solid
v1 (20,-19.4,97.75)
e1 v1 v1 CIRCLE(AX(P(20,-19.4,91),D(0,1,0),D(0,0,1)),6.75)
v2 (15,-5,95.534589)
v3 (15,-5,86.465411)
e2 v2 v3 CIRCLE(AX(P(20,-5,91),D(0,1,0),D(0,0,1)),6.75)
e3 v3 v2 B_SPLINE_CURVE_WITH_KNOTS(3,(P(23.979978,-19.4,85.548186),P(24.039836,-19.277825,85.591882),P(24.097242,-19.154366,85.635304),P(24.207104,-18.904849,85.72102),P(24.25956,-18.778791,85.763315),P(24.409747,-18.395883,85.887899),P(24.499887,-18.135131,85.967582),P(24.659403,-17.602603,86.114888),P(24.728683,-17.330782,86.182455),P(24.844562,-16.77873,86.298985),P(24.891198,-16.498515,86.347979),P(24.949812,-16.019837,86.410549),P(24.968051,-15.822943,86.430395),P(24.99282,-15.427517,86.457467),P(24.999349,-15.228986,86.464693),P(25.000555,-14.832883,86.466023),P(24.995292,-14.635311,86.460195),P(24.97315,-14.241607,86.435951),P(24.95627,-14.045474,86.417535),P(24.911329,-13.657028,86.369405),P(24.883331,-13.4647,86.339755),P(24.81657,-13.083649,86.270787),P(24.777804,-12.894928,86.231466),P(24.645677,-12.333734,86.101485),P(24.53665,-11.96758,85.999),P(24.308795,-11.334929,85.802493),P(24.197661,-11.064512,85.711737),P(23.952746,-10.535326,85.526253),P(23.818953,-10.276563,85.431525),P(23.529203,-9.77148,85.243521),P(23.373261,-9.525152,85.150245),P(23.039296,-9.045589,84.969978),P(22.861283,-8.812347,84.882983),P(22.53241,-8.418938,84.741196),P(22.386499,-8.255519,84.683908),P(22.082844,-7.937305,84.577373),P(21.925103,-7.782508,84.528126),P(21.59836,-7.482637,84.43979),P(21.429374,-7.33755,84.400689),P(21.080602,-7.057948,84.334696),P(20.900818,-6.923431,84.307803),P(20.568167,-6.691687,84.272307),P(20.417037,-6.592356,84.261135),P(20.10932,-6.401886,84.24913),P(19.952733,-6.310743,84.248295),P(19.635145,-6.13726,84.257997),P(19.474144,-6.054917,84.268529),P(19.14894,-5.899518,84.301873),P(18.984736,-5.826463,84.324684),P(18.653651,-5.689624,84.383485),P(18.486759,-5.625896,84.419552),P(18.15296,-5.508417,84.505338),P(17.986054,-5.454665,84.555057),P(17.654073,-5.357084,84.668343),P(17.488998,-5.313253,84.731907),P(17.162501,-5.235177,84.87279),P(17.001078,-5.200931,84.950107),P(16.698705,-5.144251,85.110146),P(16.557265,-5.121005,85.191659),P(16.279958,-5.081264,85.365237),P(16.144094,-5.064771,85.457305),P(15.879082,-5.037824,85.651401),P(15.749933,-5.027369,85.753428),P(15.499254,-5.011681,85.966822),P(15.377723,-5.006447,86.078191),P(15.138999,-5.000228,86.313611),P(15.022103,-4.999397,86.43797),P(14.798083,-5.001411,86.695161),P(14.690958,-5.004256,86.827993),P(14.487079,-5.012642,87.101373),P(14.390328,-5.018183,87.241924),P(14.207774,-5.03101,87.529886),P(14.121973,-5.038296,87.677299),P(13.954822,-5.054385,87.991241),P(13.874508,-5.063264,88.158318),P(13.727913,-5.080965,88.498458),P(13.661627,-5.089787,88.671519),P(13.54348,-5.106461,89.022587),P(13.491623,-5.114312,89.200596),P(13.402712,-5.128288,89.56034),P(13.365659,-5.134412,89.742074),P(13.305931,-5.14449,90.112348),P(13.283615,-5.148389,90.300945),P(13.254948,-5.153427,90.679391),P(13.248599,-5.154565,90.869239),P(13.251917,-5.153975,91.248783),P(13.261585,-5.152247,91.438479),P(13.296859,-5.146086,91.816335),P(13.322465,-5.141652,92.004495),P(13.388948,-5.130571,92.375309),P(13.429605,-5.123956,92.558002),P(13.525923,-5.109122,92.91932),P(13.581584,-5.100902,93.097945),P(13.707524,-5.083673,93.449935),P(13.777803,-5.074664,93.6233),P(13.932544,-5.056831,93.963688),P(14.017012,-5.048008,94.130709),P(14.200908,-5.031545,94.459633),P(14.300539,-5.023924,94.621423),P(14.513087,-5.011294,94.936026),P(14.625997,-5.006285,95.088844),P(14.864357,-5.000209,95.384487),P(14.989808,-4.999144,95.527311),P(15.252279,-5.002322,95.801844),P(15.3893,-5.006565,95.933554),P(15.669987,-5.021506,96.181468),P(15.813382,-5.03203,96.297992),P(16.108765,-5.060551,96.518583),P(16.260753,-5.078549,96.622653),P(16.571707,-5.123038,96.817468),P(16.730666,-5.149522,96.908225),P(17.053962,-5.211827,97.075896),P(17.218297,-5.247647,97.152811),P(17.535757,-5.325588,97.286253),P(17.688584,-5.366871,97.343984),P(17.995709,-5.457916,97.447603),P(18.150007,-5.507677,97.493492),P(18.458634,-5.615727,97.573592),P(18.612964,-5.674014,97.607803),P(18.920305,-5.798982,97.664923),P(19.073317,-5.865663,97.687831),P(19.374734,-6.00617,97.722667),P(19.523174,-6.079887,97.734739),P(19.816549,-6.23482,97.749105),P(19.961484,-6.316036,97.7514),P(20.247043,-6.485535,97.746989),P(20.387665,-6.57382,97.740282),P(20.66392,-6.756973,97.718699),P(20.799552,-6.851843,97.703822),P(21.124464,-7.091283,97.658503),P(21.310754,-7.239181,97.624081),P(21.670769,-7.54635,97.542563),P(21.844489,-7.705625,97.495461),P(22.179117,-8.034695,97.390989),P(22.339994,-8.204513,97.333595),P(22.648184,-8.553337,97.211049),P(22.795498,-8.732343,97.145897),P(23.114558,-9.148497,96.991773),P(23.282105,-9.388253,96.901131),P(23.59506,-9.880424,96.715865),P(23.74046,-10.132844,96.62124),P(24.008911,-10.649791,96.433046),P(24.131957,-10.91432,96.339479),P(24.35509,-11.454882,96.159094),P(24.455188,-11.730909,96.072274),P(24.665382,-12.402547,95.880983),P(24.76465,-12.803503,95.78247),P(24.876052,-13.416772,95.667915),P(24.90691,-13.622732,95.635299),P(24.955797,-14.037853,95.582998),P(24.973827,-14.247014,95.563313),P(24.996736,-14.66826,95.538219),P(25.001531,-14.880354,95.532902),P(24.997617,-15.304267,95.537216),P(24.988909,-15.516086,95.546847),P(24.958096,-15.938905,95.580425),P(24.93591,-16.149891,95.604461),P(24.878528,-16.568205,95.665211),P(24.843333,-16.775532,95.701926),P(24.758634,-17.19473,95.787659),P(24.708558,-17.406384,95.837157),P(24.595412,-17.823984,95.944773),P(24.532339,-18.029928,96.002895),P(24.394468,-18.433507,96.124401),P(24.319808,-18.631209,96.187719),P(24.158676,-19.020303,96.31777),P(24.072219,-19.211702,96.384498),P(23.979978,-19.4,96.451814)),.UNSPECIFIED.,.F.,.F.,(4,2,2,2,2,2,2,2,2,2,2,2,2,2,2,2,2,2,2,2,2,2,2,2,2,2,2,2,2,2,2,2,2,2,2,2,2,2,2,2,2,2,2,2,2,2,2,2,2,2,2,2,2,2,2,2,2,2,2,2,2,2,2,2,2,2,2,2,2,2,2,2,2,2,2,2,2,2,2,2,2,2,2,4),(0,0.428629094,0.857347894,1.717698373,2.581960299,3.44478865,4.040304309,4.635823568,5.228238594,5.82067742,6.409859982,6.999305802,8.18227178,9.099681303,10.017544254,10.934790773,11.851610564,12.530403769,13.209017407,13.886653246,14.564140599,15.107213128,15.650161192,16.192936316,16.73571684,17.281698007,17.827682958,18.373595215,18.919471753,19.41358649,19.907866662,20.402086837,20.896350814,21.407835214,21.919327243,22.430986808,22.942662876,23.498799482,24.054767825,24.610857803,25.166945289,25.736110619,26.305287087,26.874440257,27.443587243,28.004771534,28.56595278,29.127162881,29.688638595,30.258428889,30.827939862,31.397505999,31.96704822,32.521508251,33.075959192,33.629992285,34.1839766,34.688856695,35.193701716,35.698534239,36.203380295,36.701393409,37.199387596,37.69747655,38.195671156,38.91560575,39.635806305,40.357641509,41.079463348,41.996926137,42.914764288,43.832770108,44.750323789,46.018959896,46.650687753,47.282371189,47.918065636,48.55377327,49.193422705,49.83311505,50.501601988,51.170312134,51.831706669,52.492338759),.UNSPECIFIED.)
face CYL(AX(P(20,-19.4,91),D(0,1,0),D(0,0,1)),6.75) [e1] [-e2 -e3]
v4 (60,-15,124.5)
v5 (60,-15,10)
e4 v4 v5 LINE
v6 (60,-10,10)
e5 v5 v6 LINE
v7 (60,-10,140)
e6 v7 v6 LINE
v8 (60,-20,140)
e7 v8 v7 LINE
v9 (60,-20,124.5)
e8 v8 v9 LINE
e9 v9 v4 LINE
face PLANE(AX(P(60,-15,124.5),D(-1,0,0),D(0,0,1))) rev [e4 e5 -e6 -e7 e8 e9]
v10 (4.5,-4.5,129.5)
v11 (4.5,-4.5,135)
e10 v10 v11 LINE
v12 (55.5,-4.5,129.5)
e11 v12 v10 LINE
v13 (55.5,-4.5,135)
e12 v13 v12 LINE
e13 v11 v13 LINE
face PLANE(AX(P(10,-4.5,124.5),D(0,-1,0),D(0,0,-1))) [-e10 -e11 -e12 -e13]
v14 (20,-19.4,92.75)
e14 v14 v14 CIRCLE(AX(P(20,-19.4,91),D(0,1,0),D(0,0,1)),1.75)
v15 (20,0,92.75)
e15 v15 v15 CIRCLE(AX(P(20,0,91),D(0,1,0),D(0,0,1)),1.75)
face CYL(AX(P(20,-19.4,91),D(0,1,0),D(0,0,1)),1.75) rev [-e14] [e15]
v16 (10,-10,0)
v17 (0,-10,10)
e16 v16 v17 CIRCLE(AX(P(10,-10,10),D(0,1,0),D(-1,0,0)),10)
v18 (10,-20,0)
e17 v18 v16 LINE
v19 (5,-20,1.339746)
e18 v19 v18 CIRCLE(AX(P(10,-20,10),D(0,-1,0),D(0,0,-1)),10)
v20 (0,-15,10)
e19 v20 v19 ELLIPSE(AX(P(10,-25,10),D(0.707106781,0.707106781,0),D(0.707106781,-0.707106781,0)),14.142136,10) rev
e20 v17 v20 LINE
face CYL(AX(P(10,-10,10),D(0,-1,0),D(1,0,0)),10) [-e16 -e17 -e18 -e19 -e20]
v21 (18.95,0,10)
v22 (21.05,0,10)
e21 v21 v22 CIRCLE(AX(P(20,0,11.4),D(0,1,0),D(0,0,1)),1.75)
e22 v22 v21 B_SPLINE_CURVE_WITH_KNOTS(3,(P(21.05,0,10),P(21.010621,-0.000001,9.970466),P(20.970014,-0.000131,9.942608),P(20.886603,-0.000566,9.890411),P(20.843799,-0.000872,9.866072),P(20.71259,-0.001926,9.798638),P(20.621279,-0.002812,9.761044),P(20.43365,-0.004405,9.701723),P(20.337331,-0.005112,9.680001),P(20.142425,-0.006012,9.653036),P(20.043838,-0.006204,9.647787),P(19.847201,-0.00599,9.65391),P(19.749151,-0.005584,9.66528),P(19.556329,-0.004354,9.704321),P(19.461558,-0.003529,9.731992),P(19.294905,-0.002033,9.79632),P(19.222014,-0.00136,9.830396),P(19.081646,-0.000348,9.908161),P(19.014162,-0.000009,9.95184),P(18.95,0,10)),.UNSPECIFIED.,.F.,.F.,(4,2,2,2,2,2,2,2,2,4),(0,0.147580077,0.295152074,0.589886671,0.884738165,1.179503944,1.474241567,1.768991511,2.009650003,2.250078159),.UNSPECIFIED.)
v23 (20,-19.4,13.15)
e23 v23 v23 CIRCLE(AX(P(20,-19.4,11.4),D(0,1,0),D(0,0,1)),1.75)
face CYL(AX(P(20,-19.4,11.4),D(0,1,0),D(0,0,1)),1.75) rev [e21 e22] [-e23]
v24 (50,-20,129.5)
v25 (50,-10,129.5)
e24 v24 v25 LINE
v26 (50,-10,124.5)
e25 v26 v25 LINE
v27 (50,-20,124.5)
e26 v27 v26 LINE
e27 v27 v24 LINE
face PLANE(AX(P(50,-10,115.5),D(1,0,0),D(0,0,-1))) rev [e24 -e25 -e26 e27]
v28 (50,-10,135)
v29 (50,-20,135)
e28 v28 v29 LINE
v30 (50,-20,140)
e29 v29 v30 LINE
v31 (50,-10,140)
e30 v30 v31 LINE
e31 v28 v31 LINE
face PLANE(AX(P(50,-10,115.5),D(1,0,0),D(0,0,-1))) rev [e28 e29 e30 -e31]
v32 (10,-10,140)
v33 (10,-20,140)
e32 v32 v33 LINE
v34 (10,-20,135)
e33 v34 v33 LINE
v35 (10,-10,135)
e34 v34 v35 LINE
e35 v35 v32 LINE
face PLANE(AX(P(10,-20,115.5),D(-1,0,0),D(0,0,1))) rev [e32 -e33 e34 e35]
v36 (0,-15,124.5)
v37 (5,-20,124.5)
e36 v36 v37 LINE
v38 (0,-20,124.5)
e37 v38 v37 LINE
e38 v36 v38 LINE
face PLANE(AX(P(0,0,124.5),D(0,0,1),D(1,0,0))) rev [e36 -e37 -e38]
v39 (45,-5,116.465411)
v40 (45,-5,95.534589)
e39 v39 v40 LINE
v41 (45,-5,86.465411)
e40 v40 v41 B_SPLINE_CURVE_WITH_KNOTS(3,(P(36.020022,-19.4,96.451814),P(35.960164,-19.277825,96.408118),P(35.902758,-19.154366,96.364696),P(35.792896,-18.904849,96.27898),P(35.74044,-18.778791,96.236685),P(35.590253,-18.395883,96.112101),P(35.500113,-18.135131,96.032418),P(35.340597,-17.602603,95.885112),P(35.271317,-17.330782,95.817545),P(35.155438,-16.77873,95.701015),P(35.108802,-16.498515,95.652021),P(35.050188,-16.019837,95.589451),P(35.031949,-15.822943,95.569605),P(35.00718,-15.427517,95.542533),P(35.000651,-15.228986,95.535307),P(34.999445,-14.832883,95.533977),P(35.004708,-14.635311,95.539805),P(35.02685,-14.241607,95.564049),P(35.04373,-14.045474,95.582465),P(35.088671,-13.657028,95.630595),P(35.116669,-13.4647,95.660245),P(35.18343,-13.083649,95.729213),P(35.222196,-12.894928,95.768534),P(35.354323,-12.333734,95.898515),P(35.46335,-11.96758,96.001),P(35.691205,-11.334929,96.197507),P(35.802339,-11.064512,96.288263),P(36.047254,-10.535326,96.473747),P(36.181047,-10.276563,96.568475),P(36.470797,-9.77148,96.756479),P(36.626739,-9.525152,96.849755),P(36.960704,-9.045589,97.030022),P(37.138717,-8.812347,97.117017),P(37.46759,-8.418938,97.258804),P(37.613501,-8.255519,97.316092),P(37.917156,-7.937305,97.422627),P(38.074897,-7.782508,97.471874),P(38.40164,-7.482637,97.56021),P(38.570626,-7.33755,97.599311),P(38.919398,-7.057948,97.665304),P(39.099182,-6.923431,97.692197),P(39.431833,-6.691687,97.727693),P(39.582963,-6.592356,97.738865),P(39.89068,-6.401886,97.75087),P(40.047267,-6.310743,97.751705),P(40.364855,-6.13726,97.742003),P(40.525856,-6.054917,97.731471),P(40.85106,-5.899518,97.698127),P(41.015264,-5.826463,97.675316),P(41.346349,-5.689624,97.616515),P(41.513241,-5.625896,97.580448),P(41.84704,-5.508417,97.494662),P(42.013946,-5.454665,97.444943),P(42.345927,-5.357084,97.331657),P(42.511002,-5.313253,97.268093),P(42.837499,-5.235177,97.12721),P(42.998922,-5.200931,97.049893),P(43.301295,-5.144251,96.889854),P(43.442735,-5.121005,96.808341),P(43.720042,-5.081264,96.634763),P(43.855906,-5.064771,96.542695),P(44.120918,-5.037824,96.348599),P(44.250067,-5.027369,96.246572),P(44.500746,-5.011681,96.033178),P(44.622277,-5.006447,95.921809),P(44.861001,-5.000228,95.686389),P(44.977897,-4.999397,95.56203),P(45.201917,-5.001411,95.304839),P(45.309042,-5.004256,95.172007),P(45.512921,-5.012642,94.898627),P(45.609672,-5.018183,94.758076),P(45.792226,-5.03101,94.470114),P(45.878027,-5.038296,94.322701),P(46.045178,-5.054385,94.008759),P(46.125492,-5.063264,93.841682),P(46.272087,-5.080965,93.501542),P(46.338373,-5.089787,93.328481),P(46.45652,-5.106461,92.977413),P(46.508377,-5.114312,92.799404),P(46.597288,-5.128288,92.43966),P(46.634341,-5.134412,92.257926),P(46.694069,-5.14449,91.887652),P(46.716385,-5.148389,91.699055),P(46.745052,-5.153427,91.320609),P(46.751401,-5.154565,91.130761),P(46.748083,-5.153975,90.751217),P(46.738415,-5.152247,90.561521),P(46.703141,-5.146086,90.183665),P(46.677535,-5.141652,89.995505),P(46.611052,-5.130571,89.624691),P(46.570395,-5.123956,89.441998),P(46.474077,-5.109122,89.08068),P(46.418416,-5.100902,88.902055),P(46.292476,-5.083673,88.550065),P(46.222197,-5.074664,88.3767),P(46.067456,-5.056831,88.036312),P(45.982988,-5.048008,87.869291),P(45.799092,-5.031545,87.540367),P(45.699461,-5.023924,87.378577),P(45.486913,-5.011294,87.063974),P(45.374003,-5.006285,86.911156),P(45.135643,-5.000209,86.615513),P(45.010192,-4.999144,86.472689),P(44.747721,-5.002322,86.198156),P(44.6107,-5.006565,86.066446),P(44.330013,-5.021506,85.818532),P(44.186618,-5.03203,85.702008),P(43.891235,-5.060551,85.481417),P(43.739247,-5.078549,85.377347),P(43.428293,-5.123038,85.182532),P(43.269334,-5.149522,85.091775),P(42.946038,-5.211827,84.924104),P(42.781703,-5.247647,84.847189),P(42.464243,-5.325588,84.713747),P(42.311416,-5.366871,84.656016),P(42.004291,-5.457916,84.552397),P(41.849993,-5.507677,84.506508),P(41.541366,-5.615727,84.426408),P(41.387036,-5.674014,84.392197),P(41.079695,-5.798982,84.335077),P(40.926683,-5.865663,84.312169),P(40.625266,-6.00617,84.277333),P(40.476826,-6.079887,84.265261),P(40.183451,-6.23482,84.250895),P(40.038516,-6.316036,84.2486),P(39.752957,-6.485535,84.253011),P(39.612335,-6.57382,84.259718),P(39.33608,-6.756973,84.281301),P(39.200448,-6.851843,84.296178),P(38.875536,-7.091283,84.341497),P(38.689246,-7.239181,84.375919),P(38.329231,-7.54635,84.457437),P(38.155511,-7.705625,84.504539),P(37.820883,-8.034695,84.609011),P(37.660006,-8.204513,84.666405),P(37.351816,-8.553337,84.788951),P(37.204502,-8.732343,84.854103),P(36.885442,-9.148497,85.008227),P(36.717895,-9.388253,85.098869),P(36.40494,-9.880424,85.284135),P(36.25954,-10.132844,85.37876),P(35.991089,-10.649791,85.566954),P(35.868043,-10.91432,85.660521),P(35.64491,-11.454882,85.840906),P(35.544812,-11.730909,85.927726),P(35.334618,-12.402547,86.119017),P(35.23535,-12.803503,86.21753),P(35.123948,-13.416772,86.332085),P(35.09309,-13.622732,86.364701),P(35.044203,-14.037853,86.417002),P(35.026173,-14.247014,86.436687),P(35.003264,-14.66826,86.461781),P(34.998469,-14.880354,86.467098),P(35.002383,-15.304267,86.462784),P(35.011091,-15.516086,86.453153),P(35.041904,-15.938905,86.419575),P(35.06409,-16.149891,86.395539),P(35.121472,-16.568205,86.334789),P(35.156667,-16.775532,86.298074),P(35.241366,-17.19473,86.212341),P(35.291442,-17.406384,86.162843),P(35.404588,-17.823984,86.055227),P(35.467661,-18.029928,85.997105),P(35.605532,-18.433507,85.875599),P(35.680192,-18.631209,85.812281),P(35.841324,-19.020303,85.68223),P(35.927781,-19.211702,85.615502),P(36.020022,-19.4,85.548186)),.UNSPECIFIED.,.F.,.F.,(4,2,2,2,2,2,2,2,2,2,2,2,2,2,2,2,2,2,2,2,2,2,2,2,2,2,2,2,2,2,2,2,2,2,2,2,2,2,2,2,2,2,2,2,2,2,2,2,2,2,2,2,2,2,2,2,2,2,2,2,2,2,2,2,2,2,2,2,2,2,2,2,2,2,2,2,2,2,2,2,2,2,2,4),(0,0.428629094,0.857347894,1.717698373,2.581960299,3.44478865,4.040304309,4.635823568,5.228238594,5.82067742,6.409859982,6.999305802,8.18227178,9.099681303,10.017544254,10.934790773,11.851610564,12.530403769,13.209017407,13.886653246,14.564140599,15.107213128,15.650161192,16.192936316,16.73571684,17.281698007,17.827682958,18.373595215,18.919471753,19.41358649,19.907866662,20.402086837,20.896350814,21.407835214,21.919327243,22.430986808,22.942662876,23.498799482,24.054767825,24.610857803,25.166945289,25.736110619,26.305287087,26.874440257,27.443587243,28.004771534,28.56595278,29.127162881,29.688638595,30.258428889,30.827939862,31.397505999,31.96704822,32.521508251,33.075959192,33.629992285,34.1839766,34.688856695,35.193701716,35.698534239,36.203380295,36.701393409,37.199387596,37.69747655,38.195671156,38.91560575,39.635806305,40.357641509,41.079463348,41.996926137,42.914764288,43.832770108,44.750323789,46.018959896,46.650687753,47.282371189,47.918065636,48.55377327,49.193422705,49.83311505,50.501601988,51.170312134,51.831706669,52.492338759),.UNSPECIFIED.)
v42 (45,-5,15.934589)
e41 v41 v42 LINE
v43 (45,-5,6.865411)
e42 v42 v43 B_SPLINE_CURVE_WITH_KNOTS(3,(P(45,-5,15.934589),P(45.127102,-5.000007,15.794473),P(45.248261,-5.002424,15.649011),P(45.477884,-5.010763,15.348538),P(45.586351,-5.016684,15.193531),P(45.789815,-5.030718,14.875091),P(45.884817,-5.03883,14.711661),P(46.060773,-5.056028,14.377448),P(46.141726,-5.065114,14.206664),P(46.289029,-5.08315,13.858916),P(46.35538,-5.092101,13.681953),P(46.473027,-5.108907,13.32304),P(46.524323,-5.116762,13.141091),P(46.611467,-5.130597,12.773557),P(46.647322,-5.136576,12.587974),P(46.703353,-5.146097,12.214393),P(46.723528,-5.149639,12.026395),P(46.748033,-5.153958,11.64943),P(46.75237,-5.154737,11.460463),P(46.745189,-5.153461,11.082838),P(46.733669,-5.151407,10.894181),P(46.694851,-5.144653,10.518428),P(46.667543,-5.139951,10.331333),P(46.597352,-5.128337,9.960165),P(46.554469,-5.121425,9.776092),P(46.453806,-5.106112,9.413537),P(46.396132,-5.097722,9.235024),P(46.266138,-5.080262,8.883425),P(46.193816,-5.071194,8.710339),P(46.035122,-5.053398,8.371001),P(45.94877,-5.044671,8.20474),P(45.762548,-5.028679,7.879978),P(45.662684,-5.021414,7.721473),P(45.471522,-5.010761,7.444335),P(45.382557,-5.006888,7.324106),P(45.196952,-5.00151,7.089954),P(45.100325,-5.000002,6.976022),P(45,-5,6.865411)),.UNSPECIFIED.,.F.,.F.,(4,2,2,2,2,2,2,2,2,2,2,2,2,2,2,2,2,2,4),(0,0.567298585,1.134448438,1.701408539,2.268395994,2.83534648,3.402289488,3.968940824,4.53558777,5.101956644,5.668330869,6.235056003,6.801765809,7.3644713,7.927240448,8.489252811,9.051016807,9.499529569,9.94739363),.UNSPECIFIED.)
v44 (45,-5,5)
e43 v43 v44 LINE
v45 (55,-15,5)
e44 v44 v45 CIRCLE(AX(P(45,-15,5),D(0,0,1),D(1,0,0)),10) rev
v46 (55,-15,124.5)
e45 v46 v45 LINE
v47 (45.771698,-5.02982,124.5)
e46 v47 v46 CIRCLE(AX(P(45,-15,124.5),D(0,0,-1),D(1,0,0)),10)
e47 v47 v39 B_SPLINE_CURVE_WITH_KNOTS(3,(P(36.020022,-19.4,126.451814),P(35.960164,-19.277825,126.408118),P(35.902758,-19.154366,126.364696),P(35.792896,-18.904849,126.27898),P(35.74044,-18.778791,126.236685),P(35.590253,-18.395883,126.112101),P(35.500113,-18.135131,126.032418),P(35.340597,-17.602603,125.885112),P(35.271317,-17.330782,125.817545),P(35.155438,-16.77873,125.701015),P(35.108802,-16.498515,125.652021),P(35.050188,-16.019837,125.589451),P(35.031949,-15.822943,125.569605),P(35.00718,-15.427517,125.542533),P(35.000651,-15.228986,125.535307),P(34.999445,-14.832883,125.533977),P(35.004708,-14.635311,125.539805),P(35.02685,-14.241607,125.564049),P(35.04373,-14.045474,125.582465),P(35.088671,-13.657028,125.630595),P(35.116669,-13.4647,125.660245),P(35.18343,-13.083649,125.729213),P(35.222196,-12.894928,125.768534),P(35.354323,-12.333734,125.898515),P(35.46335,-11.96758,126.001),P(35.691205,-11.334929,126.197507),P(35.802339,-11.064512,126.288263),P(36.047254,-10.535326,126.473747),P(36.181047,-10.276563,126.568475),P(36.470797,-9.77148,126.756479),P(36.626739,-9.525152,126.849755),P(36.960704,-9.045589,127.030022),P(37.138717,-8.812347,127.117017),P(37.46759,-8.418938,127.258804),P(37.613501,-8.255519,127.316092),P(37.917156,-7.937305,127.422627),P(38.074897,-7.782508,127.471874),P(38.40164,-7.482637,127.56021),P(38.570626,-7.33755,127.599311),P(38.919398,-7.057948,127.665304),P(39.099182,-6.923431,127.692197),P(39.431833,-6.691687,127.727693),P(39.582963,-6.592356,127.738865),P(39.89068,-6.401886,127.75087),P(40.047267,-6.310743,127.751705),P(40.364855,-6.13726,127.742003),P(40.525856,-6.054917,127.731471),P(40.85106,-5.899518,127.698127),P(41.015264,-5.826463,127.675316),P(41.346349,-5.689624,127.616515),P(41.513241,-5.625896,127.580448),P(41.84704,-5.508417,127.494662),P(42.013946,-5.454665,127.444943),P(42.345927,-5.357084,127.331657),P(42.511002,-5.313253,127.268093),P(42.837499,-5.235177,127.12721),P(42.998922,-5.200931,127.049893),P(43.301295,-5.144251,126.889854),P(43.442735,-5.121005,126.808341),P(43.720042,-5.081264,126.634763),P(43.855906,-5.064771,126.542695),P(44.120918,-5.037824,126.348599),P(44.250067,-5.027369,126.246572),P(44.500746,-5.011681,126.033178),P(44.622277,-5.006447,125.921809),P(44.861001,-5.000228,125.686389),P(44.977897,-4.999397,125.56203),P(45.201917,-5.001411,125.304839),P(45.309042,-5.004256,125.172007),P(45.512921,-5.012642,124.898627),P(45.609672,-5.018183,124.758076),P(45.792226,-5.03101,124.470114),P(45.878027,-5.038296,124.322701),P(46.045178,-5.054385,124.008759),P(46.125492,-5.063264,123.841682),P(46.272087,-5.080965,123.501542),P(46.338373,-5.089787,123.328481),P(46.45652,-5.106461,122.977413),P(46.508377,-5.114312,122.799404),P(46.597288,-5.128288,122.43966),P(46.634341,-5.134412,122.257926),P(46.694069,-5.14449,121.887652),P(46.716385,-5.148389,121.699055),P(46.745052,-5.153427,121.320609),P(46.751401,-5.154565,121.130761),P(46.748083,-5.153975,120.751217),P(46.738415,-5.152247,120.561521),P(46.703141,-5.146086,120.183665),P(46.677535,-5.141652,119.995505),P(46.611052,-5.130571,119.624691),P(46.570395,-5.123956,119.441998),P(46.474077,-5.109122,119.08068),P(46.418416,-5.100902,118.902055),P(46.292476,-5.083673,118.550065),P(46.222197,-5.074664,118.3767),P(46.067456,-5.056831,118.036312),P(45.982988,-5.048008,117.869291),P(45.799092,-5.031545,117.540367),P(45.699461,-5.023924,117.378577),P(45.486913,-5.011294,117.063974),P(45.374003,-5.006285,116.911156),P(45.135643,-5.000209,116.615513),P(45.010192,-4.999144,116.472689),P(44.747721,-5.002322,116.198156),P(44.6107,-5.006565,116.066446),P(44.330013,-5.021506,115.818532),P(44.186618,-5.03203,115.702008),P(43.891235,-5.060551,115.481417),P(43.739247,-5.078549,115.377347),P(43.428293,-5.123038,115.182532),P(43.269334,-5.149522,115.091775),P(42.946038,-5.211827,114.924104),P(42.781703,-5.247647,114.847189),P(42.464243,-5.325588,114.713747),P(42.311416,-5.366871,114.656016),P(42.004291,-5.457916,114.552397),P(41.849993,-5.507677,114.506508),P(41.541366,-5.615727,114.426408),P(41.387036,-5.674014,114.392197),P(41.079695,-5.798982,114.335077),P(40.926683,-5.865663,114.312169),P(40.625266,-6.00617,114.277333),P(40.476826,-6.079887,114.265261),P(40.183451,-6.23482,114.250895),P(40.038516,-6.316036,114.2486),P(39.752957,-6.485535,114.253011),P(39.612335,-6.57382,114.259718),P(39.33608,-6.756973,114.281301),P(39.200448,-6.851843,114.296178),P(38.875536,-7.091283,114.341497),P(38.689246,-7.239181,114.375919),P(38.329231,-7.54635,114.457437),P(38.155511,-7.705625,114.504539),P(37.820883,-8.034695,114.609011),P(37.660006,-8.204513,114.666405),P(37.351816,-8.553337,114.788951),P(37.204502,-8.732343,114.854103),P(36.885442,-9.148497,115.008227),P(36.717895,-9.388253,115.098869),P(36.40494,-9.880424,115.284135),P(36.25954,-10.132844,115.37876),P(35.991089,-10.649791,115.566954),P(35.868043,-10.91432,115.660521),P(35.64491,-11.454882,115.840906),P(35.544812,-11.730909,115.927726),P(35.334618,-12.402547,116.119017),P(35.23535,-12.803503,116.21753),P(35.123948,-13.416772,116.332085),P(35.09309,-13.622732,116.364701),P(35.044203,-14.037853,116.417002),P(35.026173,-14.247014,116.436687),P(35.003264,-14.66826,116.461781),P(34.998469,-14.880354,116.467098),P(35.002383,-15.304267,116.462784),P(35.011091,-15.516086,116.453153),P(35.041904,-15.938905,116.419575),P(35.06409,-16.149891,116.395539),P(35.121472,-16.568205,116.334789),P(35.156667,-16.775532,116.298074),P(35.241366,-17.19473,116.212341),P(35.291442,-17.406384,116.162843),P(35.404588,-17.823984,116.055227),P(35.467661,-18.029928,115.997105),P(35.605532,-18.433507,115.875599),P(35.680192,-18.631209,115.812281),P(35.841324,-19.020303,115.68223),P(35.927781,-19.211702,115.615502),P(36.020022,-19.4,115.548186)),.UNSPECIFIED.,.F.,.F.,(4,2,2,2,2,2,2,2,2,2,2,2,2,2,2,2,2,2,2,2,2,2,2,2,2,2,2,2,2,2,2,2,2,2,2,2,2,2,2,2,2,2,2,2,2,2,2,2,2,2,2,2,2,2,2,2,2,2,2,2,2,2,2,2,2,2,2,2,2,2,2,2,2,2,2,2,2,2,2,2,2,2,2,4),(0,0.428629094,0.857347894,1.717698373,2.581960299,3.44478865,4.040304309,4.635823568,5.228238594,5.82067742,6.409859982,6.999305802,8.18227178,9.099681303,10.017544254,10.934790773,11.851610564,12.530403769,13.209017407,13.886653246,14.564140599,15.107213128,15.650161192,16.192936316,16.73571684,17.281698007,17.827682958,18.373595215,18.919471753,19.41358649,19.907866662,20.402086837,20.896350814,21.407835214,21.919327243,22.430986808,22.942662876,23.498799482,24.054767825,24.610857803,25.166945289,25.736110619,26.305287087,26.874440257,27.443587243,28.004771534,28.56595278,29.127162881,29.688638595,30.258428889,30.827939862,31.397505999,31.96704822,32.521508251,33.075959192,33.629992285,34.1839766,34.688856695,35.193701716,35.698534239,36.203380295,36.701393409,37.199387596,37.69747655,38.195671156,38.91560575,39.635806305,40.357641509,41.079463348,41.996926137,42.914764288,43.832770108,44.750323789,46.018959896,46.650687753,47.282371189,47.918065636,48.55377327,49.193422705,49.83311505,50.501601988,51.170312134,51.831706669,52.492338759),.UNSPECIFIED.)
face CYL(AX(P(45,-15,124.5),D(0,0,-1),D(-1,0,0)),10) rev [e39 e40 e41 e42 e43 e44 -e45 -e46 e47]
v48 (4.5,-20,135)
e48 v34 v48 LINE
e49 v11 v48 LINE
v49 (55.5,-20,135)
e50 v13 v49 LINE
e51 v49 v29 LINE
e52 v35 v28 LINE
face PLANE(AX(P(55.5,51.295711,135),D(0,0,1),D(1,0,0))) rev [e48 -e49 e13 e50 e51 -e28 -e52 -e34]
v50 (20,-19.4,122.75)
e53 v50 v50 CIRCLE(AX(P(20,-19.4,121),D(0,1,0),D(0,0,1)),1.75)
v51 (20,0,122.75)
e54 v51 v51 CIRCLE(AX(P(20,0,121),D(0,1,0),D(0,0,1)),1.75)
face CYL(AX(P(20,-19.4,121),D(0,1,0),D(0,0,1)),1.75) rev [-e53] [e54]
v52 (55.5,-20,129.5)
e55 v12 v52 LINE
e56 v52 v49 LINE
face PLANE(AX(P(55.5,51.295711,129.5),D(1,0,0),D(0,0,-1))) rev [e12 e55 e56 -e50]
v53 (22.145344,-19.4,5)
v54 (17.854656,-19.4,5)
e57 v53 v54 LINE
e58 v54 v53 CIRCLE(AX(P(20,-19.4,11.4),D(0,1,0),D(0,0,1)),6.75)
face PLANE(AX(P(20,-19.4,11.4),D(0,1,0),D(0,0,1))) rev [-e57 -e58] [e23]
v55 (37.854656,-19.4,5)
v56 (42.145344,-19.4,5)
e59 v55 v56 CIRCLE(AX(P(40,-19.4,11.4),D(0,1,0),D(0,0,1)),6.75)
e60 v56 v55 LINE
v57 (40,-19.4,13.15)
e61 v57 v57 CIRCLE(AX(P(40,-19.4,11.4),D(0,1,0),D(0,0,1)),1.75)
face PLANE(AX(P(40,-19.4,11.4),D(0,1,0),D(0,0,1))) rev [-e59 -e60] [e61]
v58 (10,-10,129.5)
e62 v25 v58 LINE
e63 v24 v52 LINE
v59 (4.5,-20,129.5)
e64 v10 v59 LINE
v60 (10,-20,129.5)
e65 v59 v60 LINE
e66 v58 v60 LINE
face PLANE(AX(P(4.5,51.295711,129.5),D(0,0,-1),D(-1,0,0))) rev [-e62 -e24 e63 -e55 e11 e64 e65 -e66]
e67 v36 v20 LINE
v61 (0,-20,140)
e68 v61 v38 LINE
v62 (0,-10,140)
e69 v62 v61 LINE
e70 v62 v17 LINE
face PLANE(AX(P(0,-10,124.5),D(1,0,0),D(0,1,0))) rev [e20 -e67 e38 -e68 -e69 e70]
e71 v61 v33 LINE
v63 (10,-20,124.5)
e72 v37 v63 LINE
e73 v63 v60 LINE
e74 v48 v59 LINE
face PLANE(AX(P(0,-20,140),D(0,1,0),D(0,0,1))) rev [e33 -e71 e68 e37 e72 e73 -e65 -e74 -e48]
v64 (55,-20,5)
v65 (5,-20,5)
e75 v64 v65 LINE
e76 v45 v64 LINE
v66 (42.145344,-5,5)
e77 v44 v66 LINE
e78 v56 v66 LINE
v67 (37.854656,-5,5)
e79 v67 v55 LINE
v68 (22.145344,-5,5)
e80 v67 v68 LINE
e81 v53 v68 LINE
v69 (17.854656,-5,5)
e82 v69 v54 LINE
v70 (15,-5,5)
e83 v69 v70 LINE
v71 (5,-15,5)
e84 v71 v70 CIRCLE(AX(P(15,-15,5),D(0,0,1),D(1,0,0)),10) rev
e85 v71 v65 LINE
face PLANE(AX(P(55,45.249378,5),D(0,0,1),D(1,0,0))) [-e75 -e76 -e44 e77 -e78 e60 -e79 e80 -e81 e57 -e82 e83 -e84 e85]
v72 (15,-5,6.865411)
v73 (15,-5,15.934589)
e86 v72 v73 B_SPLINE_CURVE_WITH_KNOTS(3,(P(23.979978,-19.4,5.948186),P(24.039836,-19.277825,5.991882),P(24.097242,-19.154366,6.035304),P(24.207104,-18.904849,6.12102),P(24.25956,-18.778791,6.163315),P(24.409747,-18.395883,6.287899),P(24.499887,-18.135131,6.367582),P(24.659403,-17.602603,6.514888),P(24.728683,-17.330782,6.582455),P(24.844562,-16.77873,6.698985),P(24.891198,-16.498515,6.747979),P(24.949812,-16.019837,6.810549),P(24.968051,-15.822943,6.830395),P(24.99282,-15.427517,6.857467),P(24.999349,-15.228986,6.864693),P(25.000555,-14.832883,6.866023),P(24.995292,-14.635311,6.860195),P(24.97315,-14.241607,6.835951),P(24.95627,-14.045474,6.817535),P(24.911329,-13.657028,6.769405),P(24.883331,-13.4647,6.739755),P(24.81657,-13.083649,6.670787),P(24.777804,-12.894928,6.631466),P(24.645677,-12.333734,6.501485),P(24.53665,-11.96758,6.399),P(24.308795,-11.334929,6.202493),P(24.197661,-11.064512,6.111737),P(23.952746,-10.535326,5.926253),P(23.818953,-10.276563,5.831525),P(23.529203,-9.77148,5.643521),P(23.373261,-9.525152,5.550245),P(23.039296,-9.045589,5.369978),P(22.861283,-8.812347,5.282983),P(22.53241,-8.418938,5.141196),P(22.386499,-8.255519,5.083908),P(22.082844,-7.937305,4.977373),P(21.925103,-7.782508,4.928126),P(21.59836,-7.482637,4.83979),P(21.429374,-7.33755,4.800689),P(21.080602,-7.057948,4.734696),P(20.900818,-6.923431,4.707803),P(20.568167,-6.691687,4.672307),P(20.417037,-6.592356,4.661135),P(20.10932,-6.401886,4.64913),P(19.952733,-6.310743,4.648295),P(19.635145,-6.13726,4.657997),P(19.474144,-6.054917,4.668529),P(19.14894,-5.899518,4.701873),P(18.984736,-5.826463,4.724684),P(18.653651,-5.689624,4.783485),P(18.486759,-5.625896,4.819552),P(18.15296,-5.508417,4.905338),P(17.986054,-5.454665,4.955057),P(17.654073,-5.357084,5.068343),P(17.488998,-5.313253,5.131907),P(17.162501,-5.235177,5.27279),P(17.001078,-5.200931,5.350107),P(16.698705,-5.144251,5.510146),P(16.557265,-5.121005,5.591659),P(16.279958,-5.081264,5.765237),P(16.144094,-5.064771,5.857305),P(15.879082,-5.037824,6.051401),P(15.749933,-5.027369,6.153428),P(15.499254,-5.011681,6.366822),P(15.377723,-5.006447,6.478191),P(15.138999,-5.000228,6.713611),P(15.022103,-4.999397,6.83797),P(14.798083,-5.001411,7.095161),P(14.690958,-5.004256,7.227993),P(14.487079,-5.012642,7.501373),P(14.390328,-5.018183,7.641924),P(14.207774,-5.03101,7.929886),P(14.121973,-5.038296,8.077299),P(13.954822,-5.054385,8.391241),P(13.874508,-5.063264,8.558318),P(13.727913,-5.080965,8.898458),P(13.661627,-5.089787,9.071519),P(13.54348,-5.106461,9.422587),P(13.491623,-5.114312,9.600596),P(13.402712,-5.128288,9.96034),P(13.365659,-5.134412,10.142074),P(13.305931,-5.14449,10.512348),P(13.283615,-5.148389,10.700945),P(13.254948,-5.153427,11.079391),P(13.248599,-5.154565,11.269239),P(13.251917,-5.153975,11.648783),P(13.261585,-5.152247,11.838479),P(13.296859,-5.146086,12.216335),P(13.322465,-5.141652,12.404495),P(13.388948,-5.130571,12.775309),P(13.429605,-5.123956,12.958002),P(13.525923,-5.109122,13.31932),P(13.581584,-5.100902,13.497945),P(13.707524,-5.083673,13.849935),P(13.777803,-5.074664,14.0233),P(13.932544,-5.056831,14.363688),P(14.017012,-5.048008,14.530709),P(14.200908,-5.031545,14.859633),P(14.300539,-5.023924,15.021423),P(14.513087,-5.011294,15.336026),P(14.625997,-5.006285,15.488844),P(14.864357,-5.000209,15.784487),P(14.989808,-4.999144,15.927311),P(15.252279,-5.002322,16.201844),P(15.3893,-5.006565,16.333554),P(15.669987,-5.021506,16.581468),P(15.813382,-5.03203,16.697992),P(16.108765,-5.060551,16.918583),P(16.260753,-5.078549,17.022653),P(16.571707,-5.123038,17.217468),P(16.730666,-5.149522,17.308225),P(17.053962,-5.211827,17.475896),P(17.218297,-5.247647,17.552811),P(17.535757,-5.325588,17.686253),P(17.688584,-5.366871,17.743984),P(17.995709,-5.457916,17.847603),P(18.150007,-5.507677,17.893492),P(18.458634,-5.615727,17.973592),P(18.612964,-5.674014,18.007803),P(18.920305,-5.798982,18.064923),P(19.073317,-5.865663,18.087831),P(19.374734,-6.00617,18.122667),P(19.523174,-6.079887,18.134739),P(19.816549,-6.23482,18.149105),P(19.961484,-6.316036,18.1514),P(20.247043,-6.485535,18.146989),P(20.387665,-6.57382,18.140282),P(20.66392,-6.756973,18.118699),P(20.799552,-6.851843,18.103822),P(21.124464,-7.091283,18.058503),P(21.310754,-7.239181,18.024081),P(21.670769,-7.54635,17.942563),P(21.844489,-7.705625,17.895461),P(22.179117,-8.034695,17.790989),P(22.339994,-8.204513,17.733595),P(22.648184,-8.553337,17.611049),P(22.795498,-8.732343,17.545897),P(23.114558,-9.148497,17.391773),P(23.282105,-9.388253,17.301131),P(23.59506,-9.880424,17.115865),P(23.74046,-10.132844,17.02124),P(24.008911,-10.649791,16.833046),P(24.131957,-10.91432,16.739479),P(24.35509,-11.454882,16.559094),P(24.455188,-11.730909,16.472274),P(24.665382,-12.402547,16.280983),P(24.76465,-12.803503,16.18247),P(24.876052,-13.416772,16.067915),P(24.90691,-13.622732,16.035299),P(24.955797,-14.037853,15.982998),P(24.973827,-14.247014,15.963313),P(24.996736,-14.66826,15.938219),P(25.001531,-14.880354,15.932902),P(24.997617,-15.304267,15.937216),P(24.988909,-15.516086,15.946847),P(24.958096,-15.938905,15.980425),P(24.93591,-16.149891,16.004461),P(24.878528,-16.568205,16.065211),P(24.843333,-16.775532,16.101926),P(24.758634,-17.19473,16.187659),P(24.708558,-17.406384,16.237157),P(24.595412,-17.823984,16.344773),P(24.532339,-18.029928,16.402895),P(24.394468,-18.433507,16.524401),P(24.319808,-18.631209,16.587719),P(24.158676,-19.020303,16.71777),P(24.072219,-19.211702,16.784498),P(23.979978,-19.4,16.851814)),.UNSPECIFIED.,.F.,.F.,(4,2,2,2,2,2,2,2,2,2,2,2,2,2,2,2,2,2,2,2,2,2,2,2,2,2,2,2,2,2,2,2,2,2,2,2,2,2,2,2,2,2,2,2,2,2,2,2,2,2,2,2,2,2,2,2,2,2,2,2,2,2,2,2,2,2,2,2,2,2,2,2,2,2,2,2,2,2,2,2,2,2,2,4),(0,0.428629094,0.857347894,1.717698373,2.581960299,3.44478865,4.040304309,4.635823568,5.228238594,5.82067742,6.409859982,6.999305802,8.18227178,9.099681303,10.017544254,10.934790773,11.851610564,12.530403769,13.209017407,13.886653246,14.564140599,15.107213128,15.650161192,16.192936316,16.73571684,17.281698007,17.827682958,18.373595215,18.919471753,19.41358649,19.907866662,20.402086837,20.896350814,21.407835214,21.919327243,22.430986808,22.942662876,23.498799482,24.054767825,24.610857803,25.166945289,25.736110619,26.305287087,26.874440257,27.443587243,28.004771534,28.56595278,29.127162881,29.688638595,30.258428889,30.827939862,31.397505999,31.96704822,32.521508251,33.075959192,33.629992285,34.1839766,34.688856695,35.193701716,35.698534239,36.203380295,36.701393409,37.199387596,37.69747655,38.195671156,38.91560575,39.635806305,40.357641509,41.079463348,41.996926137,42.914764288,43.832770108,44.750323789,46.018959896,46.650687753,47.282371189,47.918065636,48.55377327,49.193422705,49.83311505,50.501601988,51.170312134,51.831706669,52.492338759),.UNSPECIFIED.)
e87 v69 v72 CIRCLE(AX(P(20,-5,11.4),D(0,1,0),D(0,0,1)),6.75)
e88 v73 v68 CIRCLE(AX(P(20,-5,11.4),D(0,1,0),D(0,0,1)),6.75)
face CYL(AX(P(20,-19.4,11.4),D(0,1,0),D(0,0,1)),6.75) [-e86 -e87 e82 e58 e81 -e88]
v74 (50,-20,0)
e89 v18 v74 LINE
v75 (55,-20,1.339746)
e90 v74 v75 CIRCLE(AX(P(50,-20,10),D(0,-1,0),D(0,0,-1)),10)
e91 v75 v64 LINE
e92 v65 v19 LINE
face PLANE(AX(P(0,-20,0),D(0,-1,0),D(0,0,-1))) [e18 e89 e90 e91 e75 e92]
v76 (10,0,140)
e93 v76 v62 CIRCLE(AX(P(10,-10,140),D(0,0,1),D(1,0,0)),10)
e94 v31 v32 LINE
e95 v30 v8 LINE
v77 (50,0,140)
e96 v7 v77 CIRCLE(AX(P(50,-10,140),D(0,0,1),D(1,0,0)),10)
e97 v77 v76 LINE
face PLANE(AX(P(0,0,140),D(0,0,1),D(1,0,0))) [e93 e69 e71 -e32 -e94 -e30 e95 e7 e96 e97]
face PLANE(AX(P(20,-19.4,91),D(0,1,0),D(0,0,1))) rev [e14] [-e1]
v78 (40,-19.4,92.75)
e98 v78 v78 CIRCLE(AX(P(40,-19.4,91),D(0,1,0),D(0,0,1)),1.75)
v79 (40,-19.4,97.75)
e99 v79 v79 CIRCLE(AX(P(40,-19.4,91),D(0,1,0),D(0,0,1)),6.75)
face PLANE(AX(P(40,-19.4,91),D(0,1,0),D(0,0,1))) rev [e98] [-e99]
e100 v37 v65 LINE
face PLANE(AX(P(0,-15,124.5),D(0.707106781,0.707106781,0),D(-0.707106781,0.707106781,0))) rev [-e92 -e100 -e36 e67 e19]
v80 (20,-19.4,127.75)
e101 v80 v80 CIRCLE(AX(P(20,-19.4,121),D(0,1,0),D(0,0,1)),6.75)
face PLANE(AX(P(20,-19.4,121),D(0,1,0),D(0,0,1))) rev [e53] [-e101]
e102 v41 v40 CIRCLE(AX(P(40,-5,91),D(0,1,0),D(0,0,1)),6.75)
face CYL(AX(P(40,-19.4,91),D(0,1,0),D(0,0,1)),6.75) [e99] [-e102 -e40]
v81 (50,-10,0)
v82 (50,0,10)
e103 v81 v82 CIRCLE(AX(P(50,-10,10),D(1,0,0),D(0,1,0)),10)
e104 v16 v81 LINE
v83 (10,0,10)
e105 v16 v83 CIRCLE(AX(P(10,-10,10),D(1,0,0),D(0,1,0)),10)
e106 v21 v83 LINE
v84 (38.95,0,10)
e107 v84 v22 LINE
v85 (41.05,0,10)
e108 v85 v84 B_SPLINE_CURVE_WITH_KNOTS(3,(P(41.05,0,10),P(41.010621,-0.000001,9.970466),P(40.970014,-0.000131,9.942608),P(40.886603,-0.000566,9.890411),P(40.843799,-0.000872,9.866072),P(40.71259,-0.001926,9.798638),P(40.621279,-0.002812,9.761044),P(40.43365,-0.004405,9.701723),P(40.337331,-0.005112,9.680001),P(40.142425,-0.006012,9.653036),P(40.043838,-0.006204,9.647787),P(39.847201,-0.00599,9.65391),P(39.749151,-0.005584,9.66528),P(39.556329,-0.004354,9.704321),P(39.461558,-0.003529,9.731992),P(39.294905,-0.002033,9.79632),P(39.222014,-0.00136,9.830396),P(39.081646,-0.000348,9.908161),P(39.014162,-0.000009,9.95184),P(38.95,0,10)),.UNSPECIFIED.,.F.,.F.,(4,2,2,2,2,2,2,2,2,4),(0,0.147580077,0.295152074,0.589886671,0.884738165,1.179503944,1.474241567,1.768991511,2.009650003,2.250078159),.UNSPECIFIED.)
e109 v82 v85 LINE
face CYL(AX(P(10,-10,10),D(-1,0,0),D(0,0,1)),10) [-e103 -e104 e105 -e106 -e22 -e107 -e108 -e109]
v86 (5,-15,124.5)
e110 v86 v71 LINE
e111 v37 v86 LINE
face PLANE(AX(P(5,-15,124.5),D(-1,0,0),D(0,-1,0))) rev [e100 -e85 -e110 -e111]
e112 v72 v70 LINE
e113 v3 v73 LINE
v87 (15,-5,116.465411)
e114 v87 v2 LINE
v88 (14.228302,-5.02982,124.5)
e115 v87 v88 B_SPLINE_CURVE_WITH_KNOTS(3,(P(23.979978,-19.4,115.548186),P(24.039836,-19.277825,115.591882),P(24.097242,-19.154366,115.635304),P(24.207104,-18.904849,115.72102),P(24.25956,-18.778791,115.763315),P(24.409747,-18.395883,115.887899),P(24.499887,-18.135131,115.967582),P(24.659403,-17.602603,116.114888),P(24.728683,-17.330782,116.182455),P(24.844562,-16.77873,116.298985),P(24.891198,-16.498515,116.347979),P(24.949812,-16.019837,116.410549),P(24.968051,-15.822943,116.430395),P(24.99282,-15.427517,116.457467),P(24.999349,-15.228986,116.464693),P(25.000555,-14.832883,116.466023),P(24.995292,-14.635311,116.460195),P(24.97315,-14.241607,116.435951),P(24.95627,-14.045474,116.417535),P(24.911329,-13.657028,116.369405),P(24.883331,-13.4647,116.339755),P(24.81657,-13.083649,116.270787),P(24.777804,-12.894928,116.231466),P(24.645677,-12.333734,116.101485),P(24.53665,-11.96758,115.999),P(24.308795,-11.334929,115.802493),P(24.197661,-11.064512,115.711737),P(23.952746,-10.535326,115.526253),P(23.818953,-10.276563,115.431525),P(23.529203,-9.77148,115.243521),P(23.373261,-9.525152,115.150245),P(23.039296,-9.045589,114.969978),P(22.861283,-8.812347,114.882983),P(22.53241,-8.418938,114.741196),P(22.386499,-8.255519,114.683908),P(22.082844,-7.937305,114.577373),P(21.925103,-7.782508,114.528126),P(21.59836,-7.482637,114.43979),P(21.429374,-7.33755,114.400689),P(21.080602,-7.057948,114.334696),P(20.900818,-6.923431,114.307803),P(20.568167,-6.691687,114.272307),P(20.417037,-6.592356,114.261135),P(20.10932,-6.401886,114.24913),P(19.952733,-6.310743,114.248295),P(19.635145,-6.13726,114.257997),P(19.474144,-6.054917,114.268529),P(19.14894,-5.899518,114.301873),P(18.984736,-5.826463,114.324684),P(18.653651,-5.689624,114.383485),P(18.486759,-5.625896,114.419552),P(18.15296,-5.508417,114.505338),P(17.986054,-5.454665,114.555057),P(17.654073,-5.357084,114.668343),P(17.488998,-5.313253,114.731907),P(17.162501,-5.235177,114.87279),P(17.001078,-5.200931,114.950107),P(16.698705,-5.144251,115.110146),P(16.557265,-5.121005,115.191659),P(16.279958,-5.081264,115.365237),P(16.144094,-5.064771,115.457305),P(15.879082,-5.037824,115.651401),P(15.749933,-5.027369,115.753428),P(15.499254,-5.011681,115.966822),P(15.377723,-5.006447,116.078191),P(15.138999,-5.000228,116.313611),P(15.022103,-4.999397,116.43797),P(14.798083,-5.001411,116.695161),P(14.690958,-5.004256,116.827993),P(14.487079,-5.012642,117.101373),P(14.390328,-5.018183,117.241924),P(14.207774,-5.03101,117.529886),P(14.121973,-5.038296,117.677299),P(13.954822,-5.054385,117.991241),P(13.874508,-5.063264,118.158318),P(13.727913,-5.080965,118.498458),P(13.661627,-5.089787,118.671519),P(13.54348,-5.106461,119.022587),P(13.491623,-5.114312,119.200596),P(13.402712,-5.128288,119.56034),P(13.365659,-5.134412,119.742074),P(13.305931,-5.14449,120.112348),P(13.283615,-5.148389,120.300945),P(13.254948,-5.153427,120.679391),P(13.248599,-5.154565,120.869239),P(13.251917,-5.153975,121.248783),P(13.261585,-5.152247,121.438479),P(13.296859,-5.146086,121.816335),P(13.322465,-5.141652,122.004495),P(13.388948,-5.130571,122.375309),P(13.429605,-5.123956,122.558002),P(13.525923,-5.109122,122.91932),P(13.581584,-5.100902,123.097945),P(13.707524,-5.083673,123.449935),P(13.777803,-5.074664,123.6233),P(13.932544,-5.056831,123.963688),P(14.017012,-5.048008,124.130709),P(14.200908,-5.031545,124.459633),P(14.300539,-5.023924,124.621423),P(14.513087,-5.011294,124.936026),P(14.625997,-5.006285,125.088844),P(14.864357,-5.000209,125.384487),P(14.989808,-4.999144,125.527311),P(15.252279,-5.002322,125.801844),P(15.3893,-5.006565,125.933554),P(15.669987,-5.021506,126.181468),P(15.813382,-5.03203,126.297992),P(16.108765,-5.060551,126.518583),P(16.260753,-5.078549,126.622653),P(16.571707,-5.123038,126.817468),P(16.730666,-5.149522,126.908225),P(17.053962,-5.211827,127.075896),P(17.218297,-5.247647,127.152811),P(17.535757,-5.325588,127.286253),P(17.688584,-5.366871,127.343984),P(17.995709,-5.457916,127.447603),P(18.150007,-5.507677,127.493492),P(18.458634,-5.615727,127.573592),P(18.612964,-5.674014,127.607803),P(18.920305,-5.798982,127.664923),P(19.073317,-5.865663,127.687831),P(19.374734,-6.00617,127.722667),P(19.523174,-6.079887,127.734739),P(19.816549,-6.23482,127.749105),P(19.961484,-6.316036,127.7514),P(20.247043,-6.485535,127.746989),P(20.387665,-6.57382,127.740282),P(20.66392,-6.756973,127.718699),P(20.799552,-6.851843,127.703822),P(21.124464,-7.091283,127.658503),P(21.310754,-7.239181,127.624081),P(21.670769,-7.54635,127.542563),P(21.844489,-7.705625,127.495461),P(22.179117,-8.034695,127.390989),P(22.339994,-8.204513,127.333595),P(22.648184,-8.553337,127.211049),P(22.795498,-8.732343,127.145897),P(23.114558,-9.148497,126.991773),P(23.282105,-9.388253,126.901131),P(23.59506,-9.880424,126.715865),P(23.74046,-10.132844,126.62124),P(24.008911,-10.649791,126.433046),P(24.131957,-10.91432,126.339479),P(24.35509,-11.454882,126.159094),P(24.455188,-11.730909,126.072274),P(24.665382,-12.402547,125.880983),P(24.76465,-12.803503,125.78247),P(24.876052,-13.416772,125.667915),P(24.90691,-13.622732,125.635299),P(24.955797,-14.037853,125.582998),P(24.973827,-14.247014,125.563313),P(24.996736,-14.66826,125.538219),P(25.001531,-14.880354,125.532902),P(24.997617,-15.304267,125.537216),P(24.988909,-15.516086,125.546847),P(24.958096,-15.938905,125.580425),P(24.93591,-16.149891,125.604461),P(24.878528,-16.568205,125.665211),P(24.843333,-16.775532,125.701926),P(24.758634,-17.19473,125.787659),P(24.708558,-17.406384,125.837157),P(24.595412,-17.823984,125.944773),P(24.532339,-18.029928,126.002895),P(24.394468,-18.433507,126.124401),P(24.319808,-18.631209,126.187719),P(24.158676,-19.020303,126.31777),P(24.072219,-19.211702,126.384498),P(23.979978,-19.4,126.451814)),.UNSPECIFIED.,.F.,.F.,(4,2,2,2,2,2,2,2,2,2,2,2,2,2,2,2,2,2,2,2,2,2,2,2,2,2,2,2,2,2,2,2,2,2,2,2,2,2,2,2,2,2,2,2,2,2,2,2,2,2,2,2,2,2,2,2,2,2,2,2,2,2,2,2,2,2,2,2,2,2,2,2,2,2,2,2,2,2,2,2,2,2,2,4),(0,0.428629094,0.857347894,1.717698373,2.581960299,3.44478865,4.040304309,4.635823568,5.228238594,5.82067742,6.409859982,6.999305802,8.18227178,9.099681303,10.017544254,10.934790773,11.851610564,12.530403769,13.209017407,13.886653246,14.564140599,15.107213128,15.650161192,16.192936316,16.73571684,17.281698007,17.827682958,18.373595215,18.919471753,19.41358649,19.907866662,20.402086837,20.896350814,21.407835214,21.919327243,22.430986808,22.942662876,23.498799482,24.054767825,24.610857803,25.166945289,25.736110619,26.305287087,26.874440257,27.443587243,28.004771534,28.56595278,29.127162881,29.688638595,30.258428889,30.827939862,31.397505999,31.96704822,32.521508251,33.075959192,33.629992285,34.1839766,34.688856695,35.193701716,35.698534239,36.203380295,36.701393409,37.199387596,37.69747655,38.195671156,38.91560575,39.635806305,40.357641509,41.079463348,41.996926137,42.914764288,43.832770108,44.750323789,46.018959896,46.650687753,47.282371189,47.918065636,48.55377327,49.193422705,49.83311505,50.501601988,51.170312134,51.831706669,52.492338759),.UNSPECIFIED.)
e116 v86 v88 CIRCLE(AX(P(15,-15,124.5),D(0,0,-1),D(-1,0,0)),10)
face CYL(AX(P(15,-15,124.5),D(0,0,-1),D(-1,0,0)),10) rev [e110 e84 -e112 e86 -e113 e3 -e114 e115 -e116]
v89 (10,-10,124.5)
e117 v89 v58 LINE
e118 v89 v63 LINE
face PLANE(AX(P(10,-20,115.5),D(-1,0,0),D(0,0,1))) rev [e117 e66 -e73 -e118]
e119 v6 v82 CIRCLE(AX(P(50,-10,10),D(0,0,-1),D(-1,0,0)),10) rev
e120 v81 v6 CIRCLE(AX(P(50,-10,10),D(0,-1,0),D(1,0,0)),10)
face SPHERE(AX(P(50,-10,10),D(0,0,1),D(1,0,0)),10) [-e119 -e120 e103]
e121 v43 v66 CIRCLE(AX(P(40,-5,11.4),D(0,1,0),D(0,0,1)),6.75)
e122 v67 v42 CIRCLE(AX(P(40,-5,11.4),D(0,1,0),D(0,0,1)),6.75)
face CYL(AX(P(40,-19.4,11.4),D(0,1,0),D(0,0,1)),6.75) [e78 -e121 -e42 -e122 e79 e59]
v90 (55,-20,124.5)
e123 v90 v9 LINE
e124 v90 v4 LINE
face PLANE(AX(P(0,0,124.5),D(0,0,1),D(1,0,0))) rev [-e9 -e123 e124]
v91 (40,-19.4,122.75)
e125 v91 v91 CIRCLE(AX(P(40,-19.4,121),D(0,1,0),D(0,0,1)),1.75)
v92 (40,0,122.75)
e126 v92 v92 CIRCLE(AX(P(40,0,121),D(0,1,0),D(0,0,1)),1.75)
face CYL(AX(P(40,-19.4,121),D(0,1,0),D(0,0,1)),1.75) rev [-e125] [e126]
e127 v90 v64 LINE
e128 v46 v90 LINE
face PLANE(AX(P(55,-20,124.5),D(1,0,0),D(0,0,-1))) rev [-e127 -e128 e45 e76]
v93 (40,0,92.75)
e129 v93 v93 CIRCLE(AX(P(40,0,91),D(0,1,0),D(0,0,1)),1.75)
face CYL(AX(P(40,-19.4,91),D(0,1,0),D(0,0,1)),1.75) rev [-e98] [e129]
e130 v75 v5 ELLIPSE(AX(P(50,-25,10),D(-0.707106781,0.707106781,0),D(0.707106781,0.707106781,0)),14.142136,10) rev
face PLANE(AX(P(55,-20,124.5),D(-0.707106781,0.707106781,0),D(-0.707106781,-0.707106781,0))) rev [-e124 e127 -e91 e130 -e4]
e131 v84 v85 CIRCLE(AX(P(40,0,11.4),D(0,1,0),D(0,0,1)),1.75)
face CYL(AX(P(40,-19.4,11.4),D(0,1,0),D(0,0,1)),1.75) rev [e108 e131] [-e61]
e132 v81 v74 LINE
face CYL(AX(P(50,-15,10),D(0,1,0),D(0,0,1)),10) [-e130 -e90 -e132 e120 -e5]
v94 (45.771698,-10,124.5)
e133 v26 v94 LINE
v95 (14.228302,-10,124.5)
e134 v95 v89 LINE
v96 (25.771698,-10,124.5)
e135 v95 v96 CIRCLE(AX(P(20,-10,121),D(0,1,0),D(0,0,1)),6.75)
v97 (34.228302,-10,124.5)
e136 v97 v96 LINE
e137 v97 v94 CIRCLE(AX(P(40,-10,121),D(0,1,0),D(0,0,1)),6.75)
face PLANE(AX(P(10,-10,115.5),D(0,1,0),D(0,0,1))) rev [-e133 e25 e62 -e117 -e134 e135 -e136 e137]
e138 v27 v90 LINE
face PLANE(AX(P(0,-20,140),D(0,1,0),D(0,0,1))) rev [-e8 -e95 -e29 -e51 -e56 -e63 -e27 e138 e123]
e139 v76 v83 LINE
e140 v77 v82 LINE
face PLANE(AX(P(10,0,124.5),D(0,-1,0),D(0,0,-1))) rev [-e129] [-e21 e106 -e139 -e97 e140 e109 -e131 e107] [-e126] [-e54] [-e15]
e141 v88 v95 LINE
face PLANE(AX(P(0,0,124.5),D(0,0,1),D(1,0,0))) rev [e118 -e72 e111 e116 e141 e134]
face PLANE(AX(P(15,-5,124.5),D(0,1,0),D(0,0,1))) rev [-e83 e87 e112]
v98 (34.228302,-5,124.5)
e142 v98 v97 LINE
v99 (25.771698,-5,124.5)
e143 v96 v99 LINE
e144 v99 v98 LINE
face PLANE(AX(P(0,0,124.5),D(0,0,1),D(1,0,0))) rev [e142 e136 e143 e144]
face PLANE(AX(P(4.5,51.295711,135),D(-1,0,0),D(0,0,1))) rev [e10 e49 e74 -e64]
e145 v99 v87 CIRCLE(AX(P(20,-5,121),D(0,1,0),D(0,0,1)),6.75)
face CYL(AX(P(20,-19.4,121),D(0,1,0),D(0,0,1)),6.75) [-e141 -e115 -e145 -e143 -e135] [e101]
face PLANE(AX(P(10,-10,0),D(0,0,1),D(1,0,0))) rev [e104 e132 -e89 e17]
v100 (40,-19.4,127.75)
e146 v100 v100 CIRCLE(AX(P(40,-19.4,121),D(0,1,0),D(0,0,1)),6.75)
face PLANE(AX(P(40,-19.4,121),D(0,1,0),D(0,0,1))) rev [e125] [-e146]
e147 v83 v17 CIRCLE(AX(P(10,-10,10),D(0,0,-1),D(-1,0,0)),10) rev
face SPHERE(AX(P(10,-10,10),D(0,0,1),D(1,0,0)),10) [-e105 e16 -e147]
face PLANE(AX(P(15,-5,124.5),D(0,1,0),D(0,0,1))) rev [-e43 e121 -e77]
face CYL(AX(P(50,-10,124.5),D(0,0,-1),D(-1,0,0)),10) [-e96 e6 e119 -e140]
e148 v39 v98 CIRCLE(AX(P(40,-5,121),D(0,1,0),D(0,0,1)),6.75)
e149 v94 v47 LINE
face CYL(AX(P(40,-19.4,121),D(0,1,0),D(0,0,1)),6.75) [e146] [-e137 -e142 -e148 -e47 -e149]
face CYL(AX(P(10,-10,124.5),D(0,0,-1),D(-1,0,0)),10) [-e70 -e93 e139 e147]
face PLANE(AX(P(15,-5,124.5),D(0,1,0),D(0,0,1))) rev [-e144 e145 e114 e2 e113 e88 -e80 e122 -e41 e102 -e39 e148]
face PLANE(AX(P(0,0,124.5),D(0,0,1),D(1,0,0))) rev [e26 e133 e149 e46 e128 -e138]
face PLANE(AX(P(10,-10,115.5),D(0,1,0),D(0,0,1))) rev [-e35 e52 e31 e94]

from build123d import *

# Parameters (mm, degrees)
BOSS_EXTRUDE1_DEPTH = 124.5
BOSS_EXTRUDE2_DEPTH = 15.5
SKETCH4_W           = 40
SKETCH4_H           = 10
CUT_EXTRUDE3_DEPTH  = 24.5
BOSS_EXTRUDE4_REACH = 155.623
SKETCH8_W           = 50
SKETCH8_H           = 5
SKETCH9_W           = 51
SKETCH9_H           = 5.5
CUT_EXTRUDE4_DEPTH  = 15.5
SKETCH10_R          = 6.75
SKETCH10_R_2        = 1.75
BOSS_EXTRUDE5_DEPTH = 19.4
SKETCH11_R          = 1.75
CUT_EXTRUDE5_DEPTH  = 154.622914957
FILLET1_R           = 10


with BuildPart() as part:
    # Sketch1 → Boss-Extrude1 (new body)
    with BuildSketch(Plane.XY):
        with BuildLine():
            Line((15, -5), (45, -5))
            ThreePointArc((45, -5), (52.071067812, -7.928932188), (55, -15))
            Line((55, -15), (55, -20))
            Line((55, -20), (60, -15))
            Line((60, -15), (60, -10))
            ThreePointArc((60, -10), (57.071067812, -2.928932188), (50, 0))
            Line((50, 0), (10, 0))
            ThreePointArc((10, 0), (2.928932188, -2.928932188), (0, -10))
            Line((0, -10), (0, -15))
            Line((0, -15), (5, -20))
            Line((5, -20), (5, -15))
            ThreePointArc((5, -15), (7.928932188, -7.928932188), (15, -5))
        make_face()
    extrude(amount=BOSS_EXTRUDE1_DEPTH)

    # Sketch2 → Boss-Extrude2 (add)
    with BuildSketch(Plane.XY.offset(124.5)):
        with BuildLine():
            Line((50, 0), (10, 0))
            ThreePointArc((10, 0), (2.928932188, -2.928932188), (0, -10))
            Line((0, -10), (0, -20))
            Line((0, -20), (5, -20))
            Line((5, -20), (55, -20))
            Line((55, -20), (60, -20))
            Line((60, -20), (60, -10))
            ThreePointArc((60, -10), (57.071067812, -2.928932188), (50, 0))
        make_face()
    extrude(amount=BOSS_EXTRUDE2_DEPTH)

    # Sketch4 → Cut-Extrude3 (cut)
    with BuildSketch(Plane.XY.offset(140)):
        with Locations((30, -15)):
            Rectangle(SKETCH4_W, SKETCH4_H)
    extrude(amount=-CUT_EXTRUDE3_DEPTH, mode=Mode.SUBTRACT)

    # Boss-Extrude4: up to this face of the body (flat: up to its plane)
    boss_extrude4_end = Plane(part.part.faces().sort_by_distance((30, -5, 62.25))[0])
    # Sketch8 → Boss-Extrude4 (add, up to the picked face)
    with BuildSketch(Plane.XZ.offset(20), mode=Mode.PRIVATE) as boss_extrude4_sk1:
        with Locations((30, 2.5)):
            Rectangle(SKETCH8_W, SKETCH8_H)
    boss_extrude4_tool1 = split(extrude(boss_extrude4_sk1.sketch, amount=-BOSS_EXTRUDE4_REACH, mode=Mode.PRIVATE), bisect_by=boss_extrude4_end, keep=Keep.BOTH, mode=Mode.PRIVATE)
    add(boss_extrude4_tool1.solids().sort_by(Axis((30, -20, 2.5), (0, 1, 0)))[0])

    # Sketch9 → Cut-Extrude4 (cut)
    with BuildSketch(Plane(origin=(0, -20, 0), x_dir=(-1, 0, 0), z_dir=(0, -1, 0))):
        with Locations((-30, -132.25)):
            Rectangle(SKETCH9_W, SKETCH9_H)
    extrude(amount=-CUT_EXTRUDE4_DEPTH, mode=Mode.SUBTRACT)

    # Sketch10 → Boss-Extrude5 (add)
    with BuildSketch(Plane(origin=(0, 0, 0), x_dir=(1, 0, 0), z_dir=(0, 1, 0))):
        with Locations((20, -11.4)):
            Circle(SKETCH10_R)
        with Locations(Location((20, -11.4, 0), (0, 0, 270))):
            Circle(SKETCH10_R_2, mode=Mode.SUBTRACT)
    boss_extrude5 = extrude(amount=-BOSS_EXTRUDE5_DEPTH)

    # Sketch11 → Cut-Extrude5 (cut, through all)
    with BuildSketch(Plane(origin=(0, 0, 0), x_dir=(1, 0, 0), z_dir=(0, 1, 0))):
        with Locations(Location((20, -11.4, 0), (0, 0, 270))):
            Circle(SKETCH11_R)
    cut_extrude5 = extrude(amount=-CUT_EXTRUDE5_DEPTH, mode=Mode.SUBTRACT)

    # Sketch-Pattern1: Boss-Extrude5, Cut-Extrude5 at 5 more places
    with Locations((20, 0, 0), (20, 0, 79.6), (0, 0, 79.6), (0, 0, 109.6), (20, 0, 109.6)):
        add(boss_extrude5)
        add(cut_extrude5, mode=Mode.SUBTRACT)

    # Fillet1
    # the kernel refuses this fillet: 10 mm, written as the material it takes off along each edge
    with BuildSketch(Plane(origin=(60, -40, 0), x_dir=(0, 0, 1), z_dir=(0, 1, 0)), Plane(origin=(0, -10, 0), x_dir=(0, 0, 1), z_dir=(0, -1, 0))) as fillet1_piece_1:
        with BuildLine():
            CenterArc((FILLET1_R, -FILLET1_R), FILLET1_R, 90, 90)
            Line((0, -FILLET1_R), (0, 0))
            Line((0, 0), (FILLET1_R, 0))
        make_face()
    extrude(amount=30, mode=Mode.SUBTRACT)
    with BuildSketch(Plane(origin=(50, -10, 0), x_dir=(1, 0, 0), z_dir=(0, -1, 0))) as fillet1_piece_2:
        with BuildLine():
            CenterArc((10 - FILLET1_R, FILLET1_R), FILLET1_R, 270, 90)
            Line((10, FILLET1_R), (10, 0))
            Line((10, 0), (10 - FILLET1_R, 0))
        make_face()
    revolve(axis=Axis((50, -10, 0), (0, 0, 1)), revolution_arc=90, mode=Mode.SUBTRACT)
    with BuildSketch(Plane(origin=(10, -10, 0), x_dir=(0, 1, 0), z_dir=(1, 0, 0))) as fillet1_piece_3:
        with BuildLine():
            CenterArc((10 - FILLET1_R, FILLET1_R), FILLET1_R, 270, 90)
            Line((10 - FILLET1_R, 0), (10, 0))
            Line((10, 0), (10, FILLET1_R))
        make_face()
    revolve(axis=Axis((10, -10, 0), (0, 0, 1)), revolution_arc=90, mode=Mode.SUBTRACT)
    with BuildSketch(Plane(origin=(50, 0, 0), x_dir=(0, 0, 1), z_dir=(-1, 0, 0))) as fillet1_piece_4:
        with BuildLine():
            CenterArc((FILLET1_R, -FILLET1_R), FILLET1_R, 90, 90)
            Line((0, -FILLET1_R), (0, 0))
            Line((0, 0), (FILLET1_R, 0))
        make_face()
    extrude(amount=40, mode=Mode.SUBTRACT)


solid = part.part
